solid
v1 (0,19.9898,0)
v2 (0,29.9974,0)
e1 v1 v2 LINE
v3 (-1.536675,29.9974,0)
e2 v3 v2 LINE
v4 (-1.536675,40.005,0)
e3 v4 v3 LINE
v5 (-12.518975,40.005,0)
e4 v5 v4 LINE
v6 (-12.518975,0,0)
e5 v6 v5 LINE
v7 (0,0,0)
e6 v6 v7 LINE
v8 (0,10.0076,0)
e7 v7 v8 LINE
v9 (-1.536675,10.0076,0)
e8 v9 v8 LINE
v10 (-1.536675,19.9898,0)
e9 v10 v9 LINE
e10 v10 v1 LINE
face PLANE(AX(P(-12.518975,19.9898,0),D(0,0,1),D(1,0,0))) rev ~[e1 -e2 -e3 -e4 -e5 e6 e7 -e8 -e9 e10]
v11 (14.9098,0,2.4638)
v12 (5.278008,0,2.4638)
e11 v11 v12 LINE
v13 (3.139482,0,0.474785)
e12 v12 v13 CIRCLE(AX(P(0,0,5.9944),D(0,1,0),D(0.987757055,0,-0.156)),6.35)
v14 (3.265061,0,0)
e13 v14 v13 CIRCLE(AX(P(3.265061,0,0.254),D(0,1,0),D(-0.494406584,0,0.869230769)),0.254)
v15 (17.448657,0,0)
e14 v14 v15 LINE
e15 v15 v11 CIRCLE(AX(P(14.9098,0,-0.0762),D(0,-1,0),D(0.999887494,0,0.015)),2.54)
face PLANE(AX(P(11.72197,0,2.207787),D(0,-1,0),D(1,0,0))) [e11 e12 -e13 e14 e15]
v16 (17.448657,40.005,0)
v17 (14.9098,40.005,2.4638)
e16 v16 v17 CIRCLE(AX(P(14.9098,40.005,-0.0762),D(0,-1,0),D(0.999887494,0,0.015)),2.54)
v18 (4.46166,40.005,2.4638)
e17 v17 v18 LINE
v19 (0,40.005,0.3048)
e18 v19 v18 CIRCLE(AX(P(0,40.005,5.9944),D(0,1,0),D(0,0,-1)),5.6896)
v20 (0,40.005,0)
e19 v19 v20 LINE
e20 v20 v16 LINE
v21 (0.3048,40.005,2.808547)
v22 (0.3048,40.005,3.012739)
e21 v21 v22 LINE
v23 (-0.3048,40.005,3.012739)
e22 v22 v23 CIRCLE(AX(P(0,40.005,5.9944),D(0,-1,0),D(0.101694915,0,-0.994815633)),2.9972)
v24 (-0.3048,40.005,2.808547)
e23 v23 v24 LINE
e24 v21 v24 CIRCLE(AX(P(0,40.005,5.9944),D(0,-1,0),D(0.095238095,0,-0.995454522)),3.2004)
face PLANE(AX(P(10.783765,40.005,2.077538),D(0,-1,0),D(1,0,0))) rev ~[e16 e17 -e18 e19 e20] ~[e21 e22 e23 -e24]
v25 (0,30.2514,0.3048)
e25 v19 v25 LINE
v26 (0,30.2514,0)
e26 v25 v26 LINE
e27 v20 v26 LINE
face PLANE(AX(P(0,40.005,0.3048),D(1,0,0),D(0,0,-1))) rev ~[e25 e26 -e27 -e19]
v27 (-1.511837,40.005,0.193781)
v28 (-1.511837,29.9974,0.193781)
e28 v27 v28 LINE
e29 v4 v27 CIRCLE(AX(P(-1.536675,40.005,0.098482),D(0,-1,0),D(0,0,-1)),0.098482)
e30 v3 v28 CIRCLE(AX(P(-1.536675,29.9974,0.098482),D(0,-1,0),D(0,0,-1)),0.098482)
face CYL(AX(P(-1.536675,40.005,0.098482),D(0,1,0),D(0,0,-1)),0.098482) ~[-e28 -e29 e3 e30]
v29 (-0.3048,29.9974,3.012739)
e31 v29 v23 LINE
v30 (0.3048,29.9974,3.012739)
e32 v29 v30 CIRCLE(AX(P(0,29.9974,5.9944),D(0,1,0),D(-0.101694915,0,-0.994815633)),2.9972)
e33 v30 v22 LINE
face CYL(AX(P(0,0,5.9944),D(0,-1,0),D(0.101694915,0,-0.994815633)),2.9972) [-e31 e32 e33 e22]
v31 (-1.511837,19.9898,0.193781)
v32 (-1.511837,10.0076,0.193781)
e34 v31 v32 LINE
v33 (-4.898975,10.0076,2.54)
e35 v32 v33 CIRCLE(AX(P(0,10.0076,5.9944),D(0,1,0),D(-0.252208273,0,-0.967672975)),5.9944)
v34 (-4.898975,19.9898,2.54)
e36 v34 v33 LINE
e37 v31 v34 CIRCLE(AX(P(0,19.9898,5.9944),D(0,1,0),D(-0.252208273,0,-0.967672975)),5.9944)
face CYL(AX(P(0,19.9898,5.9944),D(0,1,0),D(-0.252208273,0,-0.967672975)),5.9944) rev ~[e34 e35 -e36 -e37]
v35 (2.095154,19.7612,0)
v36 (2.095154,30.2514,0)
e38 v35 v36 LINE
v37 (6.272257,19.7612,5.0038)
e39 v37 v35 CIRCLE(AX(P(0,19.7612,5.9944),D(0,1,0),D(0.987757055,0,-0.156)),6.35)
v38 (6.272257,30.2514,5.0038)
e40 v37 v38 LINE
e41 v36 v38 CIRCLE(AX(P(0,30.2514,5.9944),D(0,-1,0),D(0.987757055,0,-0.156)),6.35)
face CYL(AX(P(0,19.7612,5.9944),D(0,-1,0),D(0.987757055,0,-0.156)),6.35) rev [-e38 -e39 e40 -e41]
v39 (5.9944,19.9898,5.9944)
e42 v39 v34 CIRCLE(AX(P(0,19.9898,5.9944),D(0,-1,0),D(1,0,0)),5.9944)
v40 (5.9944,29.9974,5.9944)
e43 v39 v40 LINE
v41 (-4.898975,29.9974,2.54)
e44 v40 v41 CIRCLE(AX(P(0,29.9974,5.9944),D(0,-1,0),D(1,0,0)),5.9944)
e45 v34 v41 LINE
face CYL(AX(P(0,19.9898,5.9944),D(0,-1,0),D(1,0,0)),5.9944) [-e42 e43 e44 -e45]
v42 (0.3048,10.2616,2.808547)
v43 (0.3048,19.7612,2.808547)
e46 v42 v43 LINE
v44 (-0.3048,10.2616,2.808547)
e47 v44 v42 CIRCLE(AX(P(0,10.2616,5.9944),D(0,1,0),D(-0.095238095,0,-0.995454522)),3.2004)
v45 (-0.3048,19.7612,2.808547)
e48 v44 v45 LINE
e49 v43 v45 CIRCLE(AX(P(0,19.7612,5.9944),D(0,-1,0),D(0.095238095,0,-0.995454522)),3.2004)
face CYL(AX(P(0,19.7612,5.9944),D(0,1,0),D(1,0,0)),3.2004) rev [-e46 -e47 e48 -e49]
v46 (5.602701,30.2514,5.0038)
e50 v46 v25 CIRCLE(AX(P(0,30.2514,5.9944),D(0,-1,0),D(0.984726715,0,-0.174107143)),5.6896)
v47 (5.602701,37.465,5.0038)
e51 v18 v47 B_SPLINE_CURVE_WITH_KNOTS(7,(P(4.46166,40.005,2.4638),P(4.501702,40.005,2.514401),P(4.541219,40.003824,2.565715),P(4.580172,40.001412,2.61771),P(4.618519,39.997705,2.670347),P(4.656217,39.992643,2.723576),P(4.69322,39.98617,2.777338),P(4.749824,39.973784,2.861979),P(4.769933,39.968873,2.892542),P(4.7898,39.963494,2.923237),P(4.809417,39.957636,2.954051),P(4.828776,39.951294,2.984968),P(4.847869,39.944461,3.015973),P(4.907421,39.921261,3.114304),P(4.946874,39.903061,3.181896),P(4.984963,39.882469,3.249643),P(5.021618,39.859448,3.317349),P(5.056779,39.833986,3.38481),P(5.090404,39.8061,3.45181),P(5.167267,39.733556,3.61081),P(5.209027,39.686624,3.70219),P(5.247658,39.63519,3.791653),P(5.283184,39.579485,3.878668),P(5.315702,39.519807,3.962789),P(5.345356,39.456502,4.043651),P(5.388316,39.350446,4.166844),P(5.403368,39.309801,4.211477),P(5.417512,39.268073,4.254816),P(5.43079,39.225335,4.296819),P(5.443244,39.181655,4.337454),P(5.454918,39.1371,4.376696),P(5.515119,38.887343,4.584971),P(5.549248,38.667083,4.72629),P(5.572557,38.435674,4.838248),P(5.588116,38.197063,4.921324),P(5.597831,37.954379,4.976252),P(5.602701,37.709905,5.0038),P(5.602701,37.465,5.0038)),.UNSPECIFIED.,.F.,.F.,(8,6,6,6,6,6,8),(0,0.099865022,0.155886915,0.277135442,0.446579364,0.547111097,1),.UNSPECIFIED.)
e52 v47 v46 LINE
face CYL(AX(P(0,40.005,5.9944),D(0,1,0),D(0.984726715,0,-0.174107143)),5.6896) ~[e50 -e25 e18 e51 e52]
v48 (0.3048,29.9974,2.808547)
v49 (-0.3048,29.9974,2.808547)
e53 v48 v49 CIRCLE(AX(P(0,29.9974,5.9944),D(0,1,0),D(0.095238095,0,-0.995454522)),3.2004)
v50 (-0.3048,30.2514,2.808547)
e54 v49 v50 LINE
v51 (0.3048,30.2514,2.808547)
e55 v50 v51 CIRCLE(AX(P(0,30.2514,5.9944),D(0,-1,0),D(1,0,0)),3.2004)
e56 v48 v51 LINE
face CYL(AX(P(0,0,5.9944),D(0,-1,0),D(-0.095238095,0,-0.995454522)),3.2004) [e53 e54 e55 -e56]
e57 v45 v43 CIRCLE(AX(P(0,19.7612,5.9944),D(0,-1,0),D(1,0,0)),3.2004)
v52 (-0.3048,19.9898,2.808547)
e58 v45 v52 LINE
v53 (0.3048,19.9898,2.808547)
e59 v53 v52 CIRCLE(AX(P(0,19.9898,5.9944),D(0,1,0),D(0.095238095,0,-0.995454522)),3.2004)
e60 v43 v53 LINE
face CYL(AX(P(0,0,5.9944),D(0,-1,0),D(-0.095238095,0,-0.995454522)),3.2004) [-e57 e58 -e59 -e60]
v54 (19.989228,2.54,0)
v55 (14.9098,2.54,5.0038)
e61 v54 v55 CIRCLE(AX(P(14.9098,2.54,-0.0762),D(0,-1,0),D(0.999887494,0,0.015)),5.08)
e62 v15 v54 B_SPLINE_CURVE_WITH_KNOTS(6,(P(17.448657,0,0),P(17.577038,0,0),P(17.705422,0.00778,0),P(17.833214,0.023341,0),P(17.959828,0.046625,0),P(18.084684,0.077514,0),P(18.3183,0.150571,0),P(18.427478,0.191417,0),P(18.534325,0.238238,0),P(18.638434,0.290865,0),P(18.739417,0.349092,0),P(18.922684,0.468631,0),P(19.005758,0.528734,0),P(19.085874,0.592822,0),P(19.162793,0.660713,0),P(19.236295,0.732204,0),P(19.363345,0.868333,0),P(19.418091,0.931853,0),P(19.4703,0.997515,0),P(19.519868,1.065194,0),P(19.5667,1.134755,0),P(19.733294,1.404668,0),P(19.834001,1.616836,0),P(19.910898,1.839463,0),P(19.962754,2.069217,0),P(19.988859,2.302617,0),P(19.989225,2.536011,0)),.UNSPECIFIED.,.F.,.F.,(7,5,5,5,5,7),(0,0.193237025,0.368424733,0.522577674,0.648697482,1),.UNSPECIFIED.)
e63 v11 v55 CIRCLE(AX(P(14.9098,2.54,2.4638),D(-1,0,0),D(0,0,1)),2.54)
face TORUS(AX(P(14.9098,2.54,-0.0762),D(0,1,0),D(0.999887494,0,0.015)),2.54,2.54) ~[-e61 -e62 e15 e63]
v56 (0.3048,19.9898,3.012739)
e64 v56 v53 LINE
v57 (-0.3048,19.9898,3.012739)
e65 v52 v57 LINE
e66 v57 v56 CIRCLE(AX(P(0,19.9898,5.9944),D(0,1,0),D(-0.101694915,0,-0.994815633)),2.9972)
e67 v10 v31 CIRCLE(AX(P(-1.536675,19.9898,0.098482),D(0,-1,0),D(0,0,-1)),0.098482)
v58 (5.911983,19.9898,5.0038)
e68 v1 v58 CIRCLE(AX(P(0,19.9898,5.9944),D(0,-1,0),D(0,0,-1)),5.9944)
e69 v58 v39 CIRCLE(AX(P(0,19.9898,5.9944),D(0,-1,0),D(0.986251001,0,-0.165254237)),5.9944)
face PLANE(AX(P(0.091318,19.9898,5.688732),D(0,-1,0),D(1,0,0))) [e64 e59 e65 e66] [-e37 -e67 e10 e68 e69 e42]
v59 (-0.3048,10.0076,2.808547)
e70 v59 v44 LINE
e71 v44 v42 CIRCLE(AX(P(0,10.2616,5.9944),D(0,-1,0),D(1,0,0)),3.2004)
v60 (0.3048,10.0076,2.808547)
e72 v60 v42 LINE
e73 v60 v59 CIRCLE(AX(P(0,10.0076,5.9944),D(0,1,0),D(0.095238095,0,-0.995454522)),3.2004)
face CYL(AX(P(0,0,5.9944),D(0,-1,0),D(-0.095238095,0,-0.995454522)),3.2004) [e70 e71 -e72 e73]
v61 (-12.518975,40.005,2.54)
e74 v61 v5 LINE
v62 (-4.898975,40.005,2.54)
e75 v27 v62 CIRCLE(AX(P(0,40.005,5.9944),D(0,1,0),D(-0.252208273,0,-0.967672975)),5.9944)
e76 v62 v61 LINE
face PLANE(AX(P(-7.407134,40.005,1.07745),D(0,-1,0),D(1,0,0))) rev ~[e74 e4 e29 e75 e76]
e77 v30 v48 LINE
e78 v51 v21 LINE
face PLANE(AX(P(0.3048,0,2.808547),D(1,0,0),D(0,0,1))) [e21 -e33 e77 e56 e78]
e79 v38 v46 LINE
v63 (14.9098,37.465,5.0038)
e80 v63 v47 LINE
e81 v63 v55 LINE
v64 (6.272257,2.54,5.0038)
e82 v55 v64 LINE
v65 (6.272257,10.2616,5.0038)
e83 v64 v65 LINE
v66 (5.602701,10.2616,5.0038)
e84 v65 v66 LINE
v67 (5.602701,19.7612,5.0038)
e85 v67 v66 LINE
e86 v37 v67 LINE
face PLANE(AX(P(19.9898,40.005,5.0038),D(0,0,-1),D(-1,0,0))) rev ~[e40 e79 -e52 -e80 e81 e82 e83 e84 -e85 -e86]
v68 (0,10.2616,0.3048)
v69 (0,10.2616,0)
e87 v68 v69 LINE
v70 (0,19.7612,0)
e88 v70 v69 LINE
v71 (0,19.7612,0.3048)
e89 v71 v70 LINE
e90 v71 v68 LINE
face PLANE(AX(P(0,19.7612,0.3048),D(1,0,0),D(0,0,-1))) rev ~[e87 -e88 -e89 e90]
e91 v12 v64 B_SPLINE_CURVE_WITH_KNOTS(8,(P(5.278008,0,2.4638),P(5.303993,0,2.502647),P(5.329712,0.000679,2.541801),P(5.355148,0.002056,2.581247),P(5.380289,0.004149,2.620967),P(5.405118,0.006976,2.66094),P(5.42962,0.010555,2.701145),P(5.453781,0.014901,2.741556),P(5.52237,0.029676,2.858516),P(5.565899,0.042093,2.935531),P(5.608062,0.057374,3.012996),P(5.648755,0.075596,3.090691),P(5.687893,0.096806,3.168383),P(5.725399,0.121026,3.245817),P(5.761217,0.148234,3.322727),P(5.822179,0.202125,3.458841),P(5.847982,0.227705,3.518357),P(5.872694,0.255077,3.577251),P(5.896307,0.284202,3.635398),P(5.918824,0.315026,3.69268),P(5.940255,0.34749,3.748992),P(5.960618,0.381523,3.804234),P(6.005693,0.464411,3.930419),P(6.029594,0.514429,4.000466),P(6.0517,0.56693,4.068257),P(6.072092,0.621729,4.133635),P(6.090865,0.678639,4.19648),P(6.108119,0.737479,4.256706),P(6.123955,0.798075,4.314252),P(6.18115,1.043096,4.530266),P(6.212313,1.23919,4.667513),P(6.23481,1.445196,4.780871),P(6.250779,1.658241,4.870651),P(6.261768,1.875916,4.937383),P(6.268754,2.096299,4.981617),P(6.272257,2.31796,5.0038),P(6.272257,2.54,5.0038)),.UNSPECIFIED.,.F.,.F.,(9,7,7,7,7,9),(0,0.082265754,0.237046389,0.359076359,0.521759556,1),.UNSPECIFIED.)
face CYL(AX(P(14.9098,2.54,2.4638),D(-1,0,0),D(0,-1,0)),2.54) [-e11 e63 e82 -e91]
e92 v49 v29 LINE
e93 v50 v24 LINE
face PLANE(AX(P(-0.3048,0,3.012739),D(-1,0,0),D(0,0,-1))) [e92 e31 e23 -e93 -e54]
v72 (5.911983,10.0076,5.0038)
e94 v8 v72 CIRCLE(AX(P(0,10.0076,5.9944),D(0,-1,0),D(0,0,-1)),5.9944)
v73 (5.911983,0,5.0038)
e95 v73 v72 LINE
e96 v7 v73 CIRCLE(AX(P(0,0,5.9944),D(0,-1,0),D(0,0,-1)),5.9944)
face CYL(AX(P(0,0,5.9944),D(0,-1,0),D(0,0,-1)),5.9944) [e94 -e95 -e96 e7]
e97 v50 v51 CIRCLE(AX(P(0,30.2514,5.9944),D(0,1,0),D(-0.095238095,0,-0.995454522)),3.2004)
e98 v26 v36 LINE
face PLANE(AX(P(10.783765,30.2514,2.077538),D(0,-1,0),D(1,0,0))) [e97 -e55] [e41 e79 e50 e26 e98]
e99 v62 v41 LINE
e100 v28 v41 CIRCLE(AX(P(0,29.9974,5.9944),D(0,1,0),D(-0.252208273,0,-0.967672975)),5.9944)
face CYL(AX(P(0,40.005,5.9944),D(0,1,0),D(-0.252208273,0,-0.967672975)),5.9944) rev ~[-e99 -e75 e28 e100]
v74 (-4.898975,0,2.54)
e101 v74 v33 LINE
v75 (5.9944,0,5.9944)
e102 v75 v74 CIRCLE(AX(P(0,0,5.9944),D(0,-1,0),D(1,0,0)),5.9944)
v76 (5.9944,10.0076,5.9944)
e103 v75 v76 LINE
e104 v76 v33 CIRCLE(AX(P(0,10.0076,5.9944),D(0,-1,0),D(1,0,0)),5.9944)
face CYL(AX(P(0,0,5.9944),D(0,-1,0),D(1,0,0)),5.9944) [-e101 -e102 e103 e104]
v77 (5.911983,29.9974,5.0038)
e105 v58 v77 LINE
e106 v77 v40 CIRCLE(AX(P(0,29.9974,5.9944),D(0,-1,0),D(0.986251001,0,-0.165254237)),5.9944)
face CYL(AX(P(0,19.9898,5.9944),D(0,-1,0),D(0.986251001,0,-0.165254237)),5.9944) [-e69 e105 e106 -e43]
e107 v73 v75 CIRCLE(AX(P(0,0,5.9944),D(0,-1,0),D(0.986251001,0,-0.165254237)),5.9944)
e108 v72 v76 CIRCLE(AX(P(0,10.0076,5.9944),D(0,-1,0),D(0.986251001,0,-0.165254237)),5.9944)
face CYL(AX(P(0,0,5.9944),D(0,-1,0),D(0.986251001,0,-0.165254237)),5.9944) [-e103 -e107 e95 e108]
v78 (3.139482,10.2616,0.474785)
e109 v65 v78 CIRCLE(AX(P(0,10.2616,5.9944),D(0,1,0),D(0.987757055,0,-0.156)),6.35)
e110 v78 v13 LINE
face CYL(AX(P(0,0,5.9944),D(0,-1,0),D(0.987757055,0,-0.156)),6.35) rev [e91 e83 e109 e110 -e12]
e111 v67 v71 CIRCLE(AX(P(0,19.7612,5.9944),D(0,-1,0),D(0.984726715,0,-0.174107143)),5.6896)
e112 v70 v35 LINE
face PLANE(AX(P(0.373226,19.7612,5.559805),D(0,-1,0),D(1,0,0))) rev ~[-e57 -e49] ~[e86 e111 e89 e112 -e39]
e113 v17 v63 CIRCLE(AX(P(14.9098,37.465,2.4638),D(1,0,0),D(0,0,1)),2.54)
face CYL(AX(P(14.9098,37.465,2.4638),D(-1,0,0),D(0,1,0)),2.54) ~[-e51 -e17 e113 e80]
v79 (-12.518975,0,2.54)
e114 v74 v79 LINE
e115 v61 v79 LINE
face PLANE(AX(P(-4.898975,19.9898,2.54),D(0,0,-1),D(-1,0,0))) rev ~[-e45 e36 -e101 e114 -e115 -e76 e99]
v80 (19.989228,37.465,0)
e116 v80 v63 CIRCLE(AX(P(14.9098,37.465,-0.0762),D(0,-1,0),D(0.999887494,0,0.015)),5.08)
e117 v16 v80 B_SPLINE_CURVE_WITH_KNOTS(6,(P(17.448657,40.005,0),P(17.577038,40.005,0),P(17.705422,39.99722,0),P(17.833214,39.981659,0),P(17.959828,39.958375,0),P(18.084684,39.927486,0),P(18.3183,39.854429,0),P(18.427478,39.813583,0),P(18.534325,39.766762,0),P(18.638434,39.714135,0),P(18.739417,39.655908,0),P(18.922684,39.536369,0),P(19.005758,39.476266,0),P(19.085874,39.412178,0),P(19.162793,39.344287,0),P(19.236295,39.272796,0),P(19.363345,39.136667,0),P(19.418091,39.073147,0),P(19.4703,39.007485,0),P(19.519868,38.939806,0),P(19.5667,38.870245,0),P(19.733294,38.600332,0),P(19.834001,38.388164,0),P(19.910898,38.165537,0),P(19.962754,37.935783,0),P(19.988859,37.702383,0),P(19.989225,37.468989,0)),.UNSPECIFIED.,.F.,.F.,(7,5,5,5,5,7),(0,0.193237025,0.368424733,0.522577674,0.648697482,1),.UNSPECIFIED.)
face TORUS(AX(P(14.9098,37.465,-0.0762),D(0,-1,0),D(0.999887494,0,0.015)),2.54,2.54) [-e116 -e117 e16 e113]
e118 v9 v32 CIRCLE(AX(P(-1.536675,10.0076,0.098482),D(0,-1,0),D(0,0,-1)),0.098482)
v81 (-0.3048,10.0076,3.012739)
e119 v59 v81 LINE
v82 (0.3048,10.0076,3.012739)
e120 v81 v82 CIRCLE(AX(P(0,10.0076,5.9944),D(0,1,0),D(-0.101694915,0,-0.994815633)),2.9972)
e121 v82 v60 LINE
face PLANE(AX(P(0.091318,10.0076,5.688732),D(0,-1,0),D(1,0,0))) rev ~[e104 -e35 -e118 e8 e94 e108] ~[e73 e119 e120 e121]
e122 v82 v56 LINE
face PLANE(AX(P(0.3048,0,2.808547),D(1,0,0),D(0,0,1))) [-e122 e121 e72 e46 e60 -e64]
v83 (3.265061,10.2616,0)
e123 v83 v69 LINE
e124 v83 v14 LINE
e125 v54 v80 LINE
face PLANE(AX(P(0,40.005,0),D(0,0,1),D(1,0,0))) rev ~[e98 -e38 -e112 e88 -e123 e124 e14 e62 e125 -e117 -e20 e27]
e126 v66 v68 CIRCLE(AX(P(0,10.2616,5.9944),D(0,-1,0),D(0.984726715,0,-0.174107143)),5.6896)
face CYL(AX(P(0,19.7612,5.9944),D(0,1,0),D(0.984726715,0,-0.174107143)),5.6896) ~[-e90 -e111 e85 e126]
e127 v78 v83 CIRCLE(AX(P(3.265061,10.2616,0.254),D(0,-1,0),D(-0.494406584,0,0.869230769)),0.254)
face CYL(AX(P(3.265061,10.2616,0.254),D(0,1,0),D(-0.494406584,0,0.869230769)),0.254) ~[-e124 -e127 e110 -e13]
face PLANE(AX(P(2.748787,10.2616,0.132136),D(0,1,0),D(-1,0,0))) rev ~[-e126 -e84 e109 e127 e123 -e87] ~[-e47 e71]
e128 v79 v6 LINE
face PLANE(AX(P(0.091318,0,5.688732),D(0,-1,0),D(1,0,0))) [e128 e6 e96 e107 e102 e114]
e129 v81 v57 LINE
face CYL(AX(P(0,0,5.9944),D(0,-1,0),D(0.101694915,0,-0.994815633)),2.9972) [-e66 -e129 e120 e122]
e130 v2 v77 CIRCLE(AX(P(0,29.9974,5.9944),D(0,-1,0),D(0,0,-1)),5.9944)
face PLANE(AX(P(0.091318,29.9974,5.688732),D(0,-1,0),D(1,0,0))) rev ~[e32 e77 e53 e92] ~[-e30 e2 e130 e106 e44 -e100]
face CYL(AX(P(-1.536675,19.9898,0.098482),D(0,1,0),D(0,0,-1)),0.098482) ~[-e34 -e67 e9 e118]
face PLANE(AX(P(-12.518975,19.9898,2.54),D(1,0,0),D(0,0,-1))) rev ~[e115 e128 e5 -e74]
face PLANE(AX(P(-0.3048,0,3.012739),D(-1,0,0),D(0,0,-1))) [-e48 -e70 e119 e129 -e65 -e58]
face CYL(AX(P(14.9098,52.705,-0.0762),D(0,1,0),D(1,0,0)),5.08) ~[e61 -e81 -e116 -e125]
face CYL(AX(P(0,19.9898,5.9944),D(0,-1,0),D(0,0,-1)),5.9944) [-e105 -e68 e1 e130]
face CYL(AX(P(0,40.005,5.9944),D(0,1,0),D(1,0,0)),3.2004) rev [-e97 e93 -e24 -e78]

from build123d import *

# Parameters (mm, degrees)
F3_DEPTH     = 10.0076
F4_DEPTH     = 40.005
F6_START     = -19.9898
F6_DEPTH     = 10.0076
F7_DEPTH     = 10.0076
F9_START     = 20.2438
F2_R         = 3.2004
F9_DEPTH     = 9.4996
F10_DEPTH    = 10.2616
F11_START    = 20.0152
F11_DEPTH    = 9.9822
F12_START    = -19.7612
F12_DEPTH    = 11.6078
F13_DEPTH    = 9.7536
F14_T1_DEPTH = 13.1863686745
F15_T1_DEPTH = 65.405
F16_R        = 2.54


# Not quite as in the source:
# - a fillet or chamfer that OpenCascade refuses, or shapes differently, is made with other operations: its cross-section is extruded or revolved along the edge and cut away or added


with BuildPart() as f3:
    # F0 (on Front) → F3 (new body)
    with BuildSketch(Plane.XZ):
        with BuildLine():
            ThreePointArc((-4.8989745866, 2.54), (-2.7591462448, 0.6727514434), (0, 0))
            ThreePointArc((0, 0), (3.8726462994, 1.4188735822), (5.9119830007, 5.0038))
            ThreePointArc((5.9119830007, 5.0038), (5.9737602169, 5.4973887019), (5.9944, 5.9944))
            ThreePointArc((5.9944, 5.9944), (-1.8119627615, 11.7083848014), (-4.8989745866, 2.54))
        make_face()
        with BuildLine():
            ThreePointArc((-0.3048, 3.0127385839), (0, 8.9916), (0.3048, 3.0127385839))
            Line((0.3048, 3.0127385839), (0.3048, 2.808547348))
            ThreePointArc((0.3048, 2.808547348), (0, 2.794), (-0.3048, 2.808547348))
            Line((-0.3048, 2.808547348), (-0.3048, 3.0127385839))
        make_face(mode=Mode.SUBTRACT)
        with BuildLine():
            Line((-12.5189745866, 0), (0, 0))
            ThreePointArc((0, 0), (-2.7591462448, 0.6727514434), (-4.8989745866, 2.54))
            Line((-4.8989745866, 2.54), (-12.5189745866, 2.54))
            Line((-12.5189745866, 2.54), (-12.5189745866, 0))
        make_face()
    extrude(amount=-F3_DEPTH)

    # F0 (on Front) → F4 (join)
    with BuildSketch(Plane.XZ):
        with BuildLine():
            Line((0.3048, 2.808547348), (0.3048, 3.0127385839))
            ThreePointArc((0.3048, 3.0127385839), (0, 8.9916), (-0.3048, 3.0127385839))
            Line((-0.3048, 3.0127385839), (-0.3048, 2.808547348))
            ThreePointArc((-0.3048, 2.808547348), (0, 2.794), (0.3048, 2.808547348))
        make_face()
    extrude(amount=-F4_DEPTH)

    # F0 (on Front) → F6 (join)
    with BuildSketch(Plane.XZ.offset(F6_START)):
        with BuildLine():
            ThreePointArc((-4.8989745866, 2.54), (-2.7591462448, 0.6727514434), (0, 0))
            ThreePointArc((0, 0), (3.8726462994, 1.4188735822), (5.9119830007, 5.0038))
            ThreePointArc((5.9119830007, 5.0038), (5.9737602169, 5.4973887019), (5.9944, 5.9944))
            ThreePointArc((5.9944, 5.9944), (-1.8119627615, 11.7083848014), (-4.8989745866, 2.54))
        make_face()
        with BuildLine():
            ThreePointArc((-0.3048, 3.0127385839), (0, 8.9916), (0.3048, 3.0127385839))
            Line((0.3048, 3.0127385839), (0.3048, 2.808547348))
            ThreePointArc((0.3048, 2.808547348), (0, 2.794), (-0.3048, 2.808547348))
            Line((-0.3048, 2.808547348), (-0.3048, 3.0127385839))
        make_face(mode=Mode.SUBTRACT)
        with BuildLine():
            Line((-12.5189745866, 0), (0, 0))
            ThreePointArc((0, 0), (-2.7591462448, 0.6727514434), (-4.8989745866, 2.54))
            Line((-4.8989745866, 2.54), (-12.5189745866, 2.54))
            Line((-12.5189745866, 2.54), (-12.5189745866, 0))
        make_face()
    extrude(amount=-F6_DEPTH)

    # F2 (on offset) → F7 (join)
    with BuildSketch(Plane.XZ.offset(-40.005)):
        with BuildLine():
            ThreePointArc((-1.5118372742, 0.1937811178), (-3.4133287183, 1.0667211934), (-4.8989745866, 2.54))
            Line((-4.8989745866, 2.54), (-12.5189745866, 2.54))
            Line((-12.5189745866, 2.54), (-12.5189745866, 0))
            Line((-12.5189745866, 0), (-1.5366753453, 0))
            ThreePointArc((-1.5366753453, 0), (-1.4389921182, 0.0859617436), (-1.5118372742, 0.1937811178))
        make_face()
    extrude(amount=F7_DEPTH)

    # F2 (on offset) → F9 (join)
    with BuildSketch(Plane.XZ.offset(-40.005).offset(F9_START)):
        with BuildLine():
            Line((0, 0.3048), (0, 0))
            ThreePointArc((0, 0), (3.8726462994, 1.4188735822), (5.9119830007, 5.0038))
            Line((5.9119830007, 5.0038), (5.6027011164, 5.0038))
            ThreePointArc((5.6027011164, 5.0038), (-3.6561886166, 10.353738592), (0, 0.3048))
        make_face()
        with Locations((0, 5.9944)):
            Circle(F2_R, mode=Mode.SUBTRACT)
        with BuildLine():
            ThreePointArc((5.9119830007, 5.0038), (3.8726462994, 1.4188735822), (0, 0))
            Line((0, 0), (19.9898, 0))
            Line((19.9898, 0), (19.9898, 5.0038))
            Line((19.9898, 5.0038), (5.9119830007, 5.0038))
        make_face()
    extrude(amount=F9_DEPTH)

    # F0 (on Front) → F10 (join)
    with BuildSketch(Plane.XZ):
        with BuildLine():
            ThreePointArc((6.2722573002, 5.0038), (4.8747199854, 1.9250505355), (2.0951536077, 0))
            Line((2.0951536077, 0), (19.9898, 0))
            Line((19.9898, 0), (19.9898, 5.0038))
            Line((19.9898, 5.0038), (6.2722573002, 5.0038))
        make_face()
    extrude(amount=-F10_DEPTH)

    # F2 (on offset) → F11 (join)
    with BuildSketch(Plane.XZ.offset(-40.005).offset(F11_START)):
        with BuildLine():
            ThreePointArc((-1.5118372742, 0.1937811178), (-3.4133287183, 1.0667211934), (-4.8989745866, 2.54))
            Line((-4.8989745866, 2.54), (-12.5189745866, 2.54))
            Line((-12.5189745866, 2.54), (-12.5189745866, 0))
            Line((-12.5189745866, 0), (-1.5366753453, 0))
            ThreePointArc((-1.5366753453, 0), (-1.4389921182, 0.0859617436), (-1.5118372742, 0.1937811178))
        make_face()
    extrude(amount=F11_DEPTH)

    # F0 (on Front) → F12 (join)
    with BuildSketch(Plane.XZ.offset(F12_START)):
        with BuildLine():
            ThreePointArc((6.2722573002, 5.0038), (4.8747199854, 1.9250505355), (2.0951536077, 0))
            Line((2.0951536077, 0), (19.9898, 0))
            Line((19.9898, 0), (19.9898, 5.0038))
            Line((19.9898, 5.0038), (6.2722573002, 5.0038))
        make_face()
    extrude(amount=-F12_DEPTH)

    # F2 (on offset) → F13 (join)
    with BuildSketch(Plane.XZ.offset(-40.005)):
        with BuildLine():
            ThreePointArc((5.9119830007, 5.0038), (3.8726462994, 1.4188735822), (0, 0))
            Line((0, 0), (19.9898, 0))
            Line((19.9898, 0), (19.9898, 5.0038))
            Line((19.9898, 5.0038), (5.9119830007, 5.0038))
        make_face()
        with BuildLine():
            Line((0, 0.3048), (0, 0))
            ThreePointArc((0, 0), (3.8726462994, 1.4188735822), (5.9119830007, 5.0038))
            Line((5.9119830007, 5.0038), (5.6027011164, 5.0038))
            ThreePointArc((5.6027011164, 5.0038), (-3.6561886166, 10.353738592), (0, 0.3048))
        make_face()
        with Locations((0, 5.9944)):
            Circle(F2_R, mode=Mode.SUBTRACT)
    extrude(amount=F13_DEPTH)

    # F14: fillet of radius 0.254 on 1 edges, made by hand

    # F14_s2 → F14_t1 (cut)
    with BuildSketch(Plane.XZ.offset(-10.2616)):
        with BuildLine():
            ThreePointArc((3.1394818053, 0.4747846154), (3.0195052872, 0.1890511444), (3.2650610775, 0))
            Line((3.2650610775, 0), (2.0951536077, 0))
            ThreePointArc((2.0951536077, 0), (2.628061469, 0.2137605098), (3.1394818053, 0.4747846154))
        make_face()
    extrude(amount=F14_T1_DEPTH, mode=Mode.SUBTRACT)

    # F15: fillet of radius 5.08 on 1 edges, made by hand

    # F15_s2 → F15_t1 (cut)
    with BuildSketch(Plane.XZ.offset(-52.705)):
        with BuildLine():
            ThreePointArc((19.9898, -0.0762), (18.5019024484, 3.5159024484), (14.9098, 5.0038))
            Line((14.9098, 5.0038), (19.9898, 5.0038))
            Line((19.9898, 5.0038), (19.9898, -0.0762))
        make_face()
    extrude(amount=F15_T1_DEPTH, mode=Mode.SUBTRACT)

    # F16
    f16_edges = [f3.edges().sort_by_distance(p)[0] for p in [
        (10.256251, 40.005, 5.0038),
        (10.591029, 0, 5.0038),
        (18.47486, 40.005, 3.542743),
        (18.47486, 0, 3.542743),
    ]]
    fillet(f16_edges, radius=F16_R)


solid = f3.part
